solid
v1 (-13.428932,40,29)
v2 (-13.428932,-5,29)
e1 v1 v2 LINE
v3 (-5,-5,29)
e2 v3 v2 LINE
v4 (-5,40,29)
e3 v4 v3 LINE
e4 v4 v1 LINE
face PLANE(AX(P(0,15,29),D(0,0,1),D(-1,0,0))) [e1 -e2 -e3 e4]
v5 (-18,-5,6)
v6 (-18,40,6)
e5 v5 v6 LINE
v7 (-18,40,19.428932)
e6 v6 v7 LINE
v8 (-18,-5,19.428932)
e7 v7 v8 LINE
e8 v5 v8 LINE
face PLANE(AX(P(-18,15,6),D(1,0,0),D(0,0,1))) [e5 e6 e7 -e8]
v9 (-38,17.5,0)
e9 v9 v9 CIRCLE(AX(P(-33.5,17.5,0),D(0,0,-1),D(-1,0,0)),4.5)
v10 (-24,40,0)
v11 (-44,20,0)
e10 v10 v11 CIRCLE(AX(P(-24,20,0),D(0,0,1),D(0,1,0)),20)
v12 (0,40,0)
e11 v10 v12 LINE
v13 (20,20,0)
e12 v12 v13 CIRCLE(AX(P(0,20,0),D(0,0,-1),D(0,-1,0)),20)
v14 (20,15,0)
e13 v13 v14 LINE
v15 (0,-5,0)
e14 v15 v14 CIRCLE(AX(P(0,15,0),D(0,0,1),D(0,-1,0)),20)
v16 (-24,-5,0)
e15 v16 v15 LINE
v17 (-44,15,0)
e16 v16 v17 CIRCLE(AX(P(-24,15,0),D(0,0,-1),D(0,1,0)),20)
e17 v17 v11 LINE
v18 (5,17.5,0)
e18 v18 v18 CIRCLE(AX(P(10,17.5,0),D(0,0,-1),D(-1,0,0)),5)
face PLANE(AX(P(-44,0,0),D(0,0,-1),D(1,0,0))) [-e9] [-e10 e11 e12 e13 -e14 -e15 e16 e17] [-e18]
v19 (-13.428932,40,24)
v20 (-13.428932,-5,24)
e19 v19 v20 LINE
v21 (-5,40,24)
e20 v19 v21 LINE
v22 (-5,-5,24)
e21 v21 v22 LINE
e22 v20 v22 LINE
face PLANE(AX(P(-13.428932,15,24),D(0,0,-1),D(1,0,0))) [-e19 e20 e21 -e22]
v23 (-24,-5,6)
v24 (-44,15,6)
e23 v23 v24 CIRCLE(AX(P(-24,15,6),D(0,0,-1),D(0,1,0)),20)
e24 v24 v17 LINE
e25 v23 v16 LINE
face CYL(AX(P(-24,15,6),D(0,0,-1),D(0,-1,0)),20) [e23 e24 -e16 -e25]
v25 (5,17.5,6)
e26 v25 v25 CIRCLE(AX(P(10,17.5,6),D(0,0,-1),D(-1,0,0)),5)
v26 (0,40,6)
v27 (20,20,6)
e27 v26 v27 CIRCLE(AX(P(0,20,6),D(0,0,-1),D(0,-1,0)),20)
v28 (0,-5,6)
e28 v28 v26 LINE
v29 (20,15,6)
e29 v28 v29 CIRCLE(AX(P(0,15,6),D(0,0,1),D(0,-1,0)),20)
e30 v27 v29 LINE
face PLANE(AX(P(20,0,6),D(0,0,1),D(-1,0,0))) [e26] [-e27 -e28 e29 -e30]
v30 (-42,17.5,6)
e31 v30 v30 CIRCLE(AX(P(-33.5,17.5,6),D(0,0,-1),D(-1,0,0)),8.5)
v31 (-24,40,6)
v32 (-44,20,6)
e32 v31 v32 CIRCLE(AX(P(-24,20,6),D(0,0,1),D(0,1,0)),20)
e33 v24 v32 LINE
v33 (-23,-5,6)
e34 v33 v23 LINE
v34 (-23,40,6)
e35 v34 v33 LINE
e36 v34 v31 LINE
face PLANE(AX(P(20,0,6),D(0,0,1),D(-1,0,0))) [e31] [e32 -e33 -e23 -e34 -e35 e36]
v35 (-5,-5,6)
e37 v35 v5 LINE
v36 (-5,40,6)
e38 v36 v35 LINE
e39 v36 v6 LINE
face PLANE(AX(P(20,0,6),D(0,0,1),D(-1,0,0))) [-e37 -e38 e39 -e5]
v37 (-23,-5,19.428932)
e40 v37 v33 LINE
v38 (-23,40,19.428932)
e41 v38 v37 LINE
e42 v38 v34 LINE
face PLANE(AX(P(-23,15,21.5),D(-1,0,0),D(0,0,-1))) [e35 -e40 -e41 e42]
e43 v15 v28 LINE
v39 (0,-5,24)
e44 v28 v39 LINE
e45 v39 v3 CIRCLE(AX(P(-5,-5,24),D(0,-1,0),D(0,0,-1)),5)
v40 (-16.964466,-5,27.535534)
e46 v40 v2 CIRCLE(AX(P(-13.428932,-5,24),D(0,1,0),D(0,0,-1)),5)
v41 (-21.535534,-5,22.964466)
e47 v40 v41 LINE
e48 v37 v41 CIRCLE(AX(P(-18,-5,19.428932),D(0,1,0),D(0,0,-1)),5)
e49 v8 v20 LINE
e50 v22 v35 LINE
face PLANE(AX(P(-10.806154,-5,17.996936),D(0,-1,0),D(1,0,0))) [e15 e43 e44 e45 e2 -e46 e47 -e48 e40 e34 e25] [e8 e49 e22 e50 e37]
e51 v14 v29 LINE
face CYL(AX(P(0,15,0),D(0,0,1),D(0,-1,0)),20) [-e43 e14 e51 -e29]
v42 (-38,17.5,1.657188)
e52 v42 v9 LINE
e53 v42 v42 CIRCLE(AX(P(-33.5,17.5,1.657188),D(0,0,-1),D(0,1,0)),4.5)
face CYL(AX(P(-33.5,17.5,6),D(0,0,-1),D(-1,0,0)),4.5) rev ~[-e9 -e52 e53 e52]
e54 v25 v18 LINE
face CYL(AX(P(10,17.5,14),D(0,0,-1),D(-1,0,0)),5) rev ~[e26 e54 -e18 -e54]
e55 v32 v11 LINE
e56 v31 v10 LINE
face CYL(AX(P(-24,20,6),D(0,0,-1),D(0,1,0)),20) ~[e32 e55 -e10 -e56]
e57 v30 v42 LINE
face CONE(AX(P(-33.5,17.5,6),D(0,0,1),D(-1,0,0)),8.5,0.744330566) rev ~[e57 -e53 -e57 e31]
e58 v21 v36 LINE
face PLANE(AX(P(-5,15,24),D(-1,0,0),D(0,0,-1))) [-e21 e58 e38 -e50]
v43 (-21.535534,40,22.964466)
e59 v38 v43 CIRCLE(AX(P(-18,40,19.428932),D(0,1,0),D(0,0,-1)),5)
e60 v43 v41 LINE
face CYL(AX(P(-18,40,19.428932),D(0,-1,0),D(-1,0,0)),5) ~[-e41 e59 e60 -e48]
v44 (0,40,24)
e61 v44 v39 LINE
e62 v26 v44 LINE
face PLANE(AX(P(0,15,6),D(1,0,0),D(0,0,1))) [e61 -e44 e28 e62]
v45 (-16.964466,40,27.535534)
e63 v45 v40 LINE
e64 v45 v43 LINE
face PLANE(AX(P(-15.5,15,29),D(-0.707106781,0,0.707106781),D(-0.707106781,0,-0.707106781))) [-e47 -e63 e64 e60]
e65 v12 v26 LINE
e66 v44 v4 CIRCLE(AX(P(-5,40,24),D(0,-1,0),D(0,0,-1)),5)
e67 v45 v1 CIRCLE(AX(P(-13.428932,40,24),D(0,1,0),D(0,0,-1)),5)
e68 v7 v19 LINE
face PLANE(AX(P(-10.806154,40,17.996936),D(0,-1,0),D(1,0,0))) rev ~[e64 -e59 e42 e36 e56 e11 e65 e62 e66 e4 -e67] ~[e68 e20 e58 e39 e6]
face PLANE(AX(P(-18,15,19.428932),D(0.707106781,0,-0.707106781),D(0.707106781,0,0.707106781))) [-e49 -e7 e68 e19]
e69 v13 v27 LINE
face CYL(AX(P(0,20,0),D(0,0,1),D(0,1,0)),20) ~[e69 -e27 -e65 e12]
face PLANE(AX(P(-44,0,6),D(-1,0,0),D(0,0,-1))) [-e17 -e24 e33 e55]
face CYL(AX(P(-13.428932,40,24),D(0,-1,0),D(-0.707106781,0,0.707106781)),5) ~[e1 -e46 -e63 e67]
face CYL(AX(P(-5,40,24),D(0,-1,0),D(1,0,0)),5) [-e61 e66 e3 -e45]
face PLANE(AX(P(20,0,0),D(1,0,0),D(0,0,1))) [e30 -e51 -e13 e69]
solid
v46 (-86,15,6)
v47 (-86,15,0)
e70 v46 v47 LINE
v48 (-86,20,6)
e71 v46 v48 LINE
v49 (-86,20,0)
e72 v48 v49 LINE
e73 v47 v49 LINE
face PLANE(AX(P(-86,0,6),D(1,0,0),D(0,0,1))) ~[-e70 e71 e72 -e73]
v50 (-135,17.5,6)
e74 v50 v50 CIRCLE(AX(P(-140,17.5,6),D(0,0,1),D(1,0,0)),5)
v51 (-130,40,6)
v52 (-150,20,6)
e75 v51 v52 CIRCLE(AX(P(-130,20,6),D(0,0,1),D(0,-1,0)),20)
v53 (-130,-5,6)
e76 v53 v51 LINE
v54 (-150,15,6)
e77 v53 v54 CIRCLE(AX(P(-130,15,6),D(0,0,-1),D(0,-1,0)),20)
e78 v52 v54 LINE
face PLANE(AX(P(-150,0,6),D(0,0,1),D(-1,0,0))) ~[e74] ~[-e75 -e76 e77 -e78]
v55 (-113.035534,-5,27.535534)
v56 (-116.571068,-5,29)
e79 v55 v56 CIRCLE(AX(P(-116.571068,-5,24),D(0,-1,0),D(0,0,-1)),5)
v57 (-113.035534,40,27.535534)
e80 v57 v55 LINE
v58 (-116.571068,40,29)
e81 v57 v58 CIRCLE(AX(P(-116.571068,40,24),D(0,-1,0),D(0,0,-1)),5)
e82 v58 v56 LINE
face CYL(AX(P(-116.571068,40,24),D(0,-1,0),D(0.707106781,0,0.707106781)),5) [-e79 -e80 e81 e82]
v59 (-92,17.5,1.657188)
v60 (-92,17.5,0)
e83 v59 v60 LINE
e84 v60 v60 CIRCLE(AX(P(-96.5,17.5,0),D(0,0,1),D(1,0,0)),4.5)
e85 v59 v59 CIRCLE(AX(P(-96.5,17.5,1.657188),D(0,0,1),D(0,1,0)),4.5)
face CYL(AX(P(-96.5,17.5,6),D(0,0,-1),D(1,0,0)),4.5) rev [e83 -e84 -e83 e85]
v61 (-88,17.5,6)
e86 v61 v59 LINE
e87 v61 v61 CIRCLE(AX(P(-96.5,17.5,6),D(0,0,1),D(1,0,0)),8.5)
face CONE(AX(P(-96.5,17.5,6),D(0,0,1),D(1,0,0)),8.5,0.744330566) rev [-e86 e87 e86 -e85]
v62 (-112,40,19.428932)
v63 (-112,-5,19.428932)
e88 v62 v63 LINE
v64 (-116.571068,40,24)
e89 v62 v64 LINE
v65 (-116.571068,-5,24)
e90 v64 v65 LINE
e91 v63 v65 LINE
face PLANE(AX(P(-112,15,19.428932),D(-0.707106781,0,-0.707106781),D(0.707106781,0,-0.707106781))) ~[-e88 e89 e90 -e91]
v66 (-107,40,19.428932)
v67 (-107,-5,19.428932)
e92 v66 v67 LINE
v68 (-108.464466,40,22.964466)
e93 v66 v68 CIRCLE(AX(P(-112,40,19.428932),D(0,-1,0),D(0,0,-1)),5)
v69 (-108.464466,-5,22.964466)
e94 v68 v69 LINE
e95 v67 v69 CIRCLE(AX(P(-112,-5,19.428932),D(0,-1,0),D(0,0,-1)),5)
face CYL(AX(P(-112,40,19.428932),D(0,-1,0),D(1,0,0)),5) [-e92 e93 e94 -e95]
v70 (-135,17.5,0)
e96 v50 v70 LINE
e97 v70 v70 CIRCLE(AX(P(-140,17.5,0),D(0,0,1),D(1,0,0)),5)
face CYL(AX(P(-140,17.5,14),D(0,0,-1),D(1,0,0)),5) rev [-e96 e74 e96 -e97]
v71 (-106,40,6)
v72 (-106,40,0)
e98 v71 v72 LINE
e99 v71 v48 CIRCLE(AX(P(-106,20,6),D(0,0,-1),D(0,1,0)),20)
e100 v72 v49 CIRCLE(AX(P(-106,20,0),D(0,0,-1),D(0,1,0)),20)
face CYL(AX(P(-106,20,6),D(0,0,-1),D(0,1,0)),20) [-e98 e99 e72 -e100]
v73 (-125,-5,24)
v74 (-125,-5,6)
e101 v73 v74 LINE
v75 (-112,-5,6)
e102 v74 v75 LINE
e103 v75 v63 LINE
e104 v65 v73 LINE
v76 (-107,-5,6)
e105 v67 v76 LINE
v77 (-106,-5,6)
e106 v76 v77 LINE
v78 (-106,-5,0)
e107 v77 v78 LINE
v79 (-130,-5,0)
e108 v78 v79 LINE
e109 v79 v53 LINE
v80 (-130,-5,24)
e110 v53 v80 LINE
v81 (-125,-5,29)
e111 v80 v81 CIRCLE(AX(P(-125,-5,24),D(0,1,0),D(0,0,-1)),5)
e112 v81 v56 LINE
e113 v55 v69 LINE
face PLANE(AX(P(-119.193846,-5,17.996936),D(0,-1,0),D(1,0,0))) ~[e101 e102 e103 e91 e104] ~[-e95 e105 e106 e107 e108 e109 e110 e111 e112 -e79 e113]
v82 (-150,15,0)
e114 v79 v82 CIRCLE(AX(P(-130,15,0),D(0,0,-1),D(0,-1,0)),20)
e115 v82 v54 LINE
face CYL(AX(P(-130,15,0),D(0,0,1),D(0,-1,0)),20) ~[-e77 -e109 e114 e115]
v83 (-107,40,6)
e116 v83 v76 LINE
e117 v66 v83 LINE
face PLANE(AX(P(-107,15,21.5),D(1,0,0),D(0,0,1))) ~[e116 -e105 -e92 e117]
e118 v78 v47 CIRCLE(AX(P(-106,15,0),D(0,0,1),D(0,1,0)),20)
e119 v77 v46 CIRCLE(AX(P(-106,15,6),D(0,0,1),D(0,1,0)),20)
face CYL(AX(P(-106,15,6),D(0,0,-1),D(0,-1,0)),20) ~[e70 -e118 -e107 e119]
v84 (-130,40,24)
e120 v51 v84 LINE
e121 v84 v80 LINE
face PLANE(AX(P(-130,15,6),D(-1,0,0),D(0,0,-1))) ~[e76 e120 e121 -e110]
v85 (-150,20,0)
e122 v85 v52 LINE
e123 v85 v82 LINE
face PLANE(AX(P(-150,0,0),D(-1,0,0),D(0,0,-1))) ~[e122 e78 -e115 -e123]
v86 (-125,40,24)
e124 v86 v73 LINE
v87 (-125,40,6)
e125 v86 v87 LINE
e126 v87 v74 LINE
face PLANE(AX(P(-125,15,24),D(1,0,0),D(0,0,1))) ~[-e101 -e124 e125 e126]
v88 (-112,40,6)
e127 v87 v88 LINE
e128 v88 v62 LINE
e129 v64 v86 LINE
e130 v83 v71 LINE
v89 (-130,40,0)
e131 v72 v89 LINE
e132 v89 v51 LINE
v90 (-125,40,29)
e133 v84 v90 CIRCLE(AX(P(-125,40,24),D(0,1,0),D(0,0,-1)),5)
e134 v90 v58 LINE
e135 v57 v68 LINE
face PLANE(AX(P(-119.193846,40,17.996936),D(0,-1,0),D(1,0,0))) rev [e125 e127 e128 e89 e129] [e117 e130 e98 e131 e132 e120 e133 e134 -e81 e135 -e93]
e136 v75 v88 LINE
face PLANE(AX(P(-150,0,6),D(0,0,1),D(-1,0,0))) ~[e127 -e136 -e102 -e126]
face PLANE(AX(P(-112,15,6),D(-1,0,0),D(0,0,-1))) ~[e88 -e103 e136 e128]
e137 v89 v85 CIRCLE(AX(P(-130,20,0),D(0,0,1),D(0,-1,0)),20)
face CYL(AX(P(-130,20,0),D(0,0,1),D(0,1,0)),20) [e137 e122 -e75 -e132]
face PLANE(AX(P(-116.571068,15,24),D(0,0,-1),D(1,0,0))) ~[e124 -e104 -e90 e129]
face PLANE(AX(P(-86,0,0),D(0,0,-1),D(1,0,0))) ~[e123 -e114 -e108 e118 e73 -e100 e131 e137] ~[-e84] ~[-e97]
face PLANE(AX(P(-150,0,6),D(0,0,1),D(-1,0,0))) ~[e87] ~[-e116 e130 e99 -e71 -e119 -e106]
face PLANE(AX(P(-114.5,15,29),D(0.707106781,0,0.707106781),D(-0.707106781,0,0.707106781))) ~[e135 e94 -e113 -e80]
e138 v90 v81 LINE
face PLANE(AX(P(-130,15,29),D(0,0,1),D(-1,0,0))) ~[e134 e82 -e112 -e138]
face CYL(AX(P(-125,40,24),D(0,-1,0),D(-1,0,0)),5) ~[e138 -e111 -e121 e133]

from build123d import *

# Parameters (mm, degrees)
F6_DEPTH        = 5
F7_DEPTH        = 20
F8_DEPTH        = 40
F9_DEPTH        = 25
F10_R           = 5
F11_R           = 20
F12_D           = 9
F12_DEPTH       = 8
F12_CSINK_D     = 17
F12_CSINK_ANGLE = 85.294
F12_TIP         = 2.7038727856
F13_D           = 10
F13_DEPTH       = 8
F13_TIP         = 3.0043030951


# Not quite as in the source:
# - a feature names something its author has since deleted; it is built from what else it names


with BuildPart() as f6:
    # F3 (on Front) → F6 (new body)
    with BuildSketch(Plane.XZ):
        Polygon((-44, 0), (0, 0), (20, 0), (20, 6), (-44, 6), align=None)
    extrude(amount=F6_DEPTH)

    # F4 (on offset) → F7 (join)
    with BuildSketch(Plane.XZ.offset(-15)):
        Polygon((-5, 6), (0, 6), (0, 29), (-15.5, 29), (-23, 21.5), (-23, 6), (-18, 6), (-18, 19.4289321881), (-13.4289321881, 24), (-5, 24), align=None)
    extrude(amount=F7_DEPTH)

    # F3 (on Front) → F8 (join)
    with BuildSketch(Plane.XZ):
        Polygon((-44, 0), (0, 0), (20, 0), (20, 6), (-44, 6), align=None)
    extrude(amount=-F8_DEPTH)

    # F4 (on offset) → F9 (join)
    with BuildSketch(Plane.XZ.offset(-15)):
        Polygon((-5, 6), (0, 6), (0, 29), (-15.5, 29), (-23, 21.5), (-23, 6), (-18, 6), (-18, 19.4289321881), (-13.4289321881, 24), (-5, 24), align=None)
    extrude(amount=-F9_DEPTH)

    # F10
    f10_edges = [f6.edges().sort_by_distance(p)[0] for p in [
        (-15.5, 17.5, 29),
        (-23, 17.5, 21.5),
        (0, 17.5, 29),
    ]]
    fillet(f10_edges, radius=F10_R)

    # F11
    f11_edges = [f6.edges().sort_by_distance(p)[0] for p in [
        (20, -5, 3),
        (20, 40, 3),
        (-44, 40, 3),
        (-44, -5, 3),
    ]]
    fillet(f11_edges, radius=F11_R)

    # F12
    with Locations(Plane.XY.offset(6)):
        with Locations((-33.5, 17.5)):
            CounterSinkHole(F12_D / 2, F12_CSINK_D / 2, depth=F12_DEPTH, counter_sink_angle=F12_CSINK_ANGLE)
            with Locations((0, 0, -(F12_DEPTH + F12_TIP / 2))):  # 118° drill point
                Cone(0, F12_D / 2, F12_TIP, mode=Mode.SUBTRACT)

    # F13
    with Locations(Plane.XY.offset(6)):
        with Locations((10, 17.5)):
            Hole(F13_D / 2, depth=F13_DEPTH)
            with Locations((0, 0, -(F13_DEPTH + F13_TIP / 2))):  # 118° drill point
                Cone(0, F13_D / 2, F13_TIP, mode=Mode.SUBTRACT)


with BuildPart() as f15_1:
    # F15: instance of F6
    add(f6.part.mirror(Plane.YZ.offset(-65)))


solid = Compound([f6.part, f15_1.part])
